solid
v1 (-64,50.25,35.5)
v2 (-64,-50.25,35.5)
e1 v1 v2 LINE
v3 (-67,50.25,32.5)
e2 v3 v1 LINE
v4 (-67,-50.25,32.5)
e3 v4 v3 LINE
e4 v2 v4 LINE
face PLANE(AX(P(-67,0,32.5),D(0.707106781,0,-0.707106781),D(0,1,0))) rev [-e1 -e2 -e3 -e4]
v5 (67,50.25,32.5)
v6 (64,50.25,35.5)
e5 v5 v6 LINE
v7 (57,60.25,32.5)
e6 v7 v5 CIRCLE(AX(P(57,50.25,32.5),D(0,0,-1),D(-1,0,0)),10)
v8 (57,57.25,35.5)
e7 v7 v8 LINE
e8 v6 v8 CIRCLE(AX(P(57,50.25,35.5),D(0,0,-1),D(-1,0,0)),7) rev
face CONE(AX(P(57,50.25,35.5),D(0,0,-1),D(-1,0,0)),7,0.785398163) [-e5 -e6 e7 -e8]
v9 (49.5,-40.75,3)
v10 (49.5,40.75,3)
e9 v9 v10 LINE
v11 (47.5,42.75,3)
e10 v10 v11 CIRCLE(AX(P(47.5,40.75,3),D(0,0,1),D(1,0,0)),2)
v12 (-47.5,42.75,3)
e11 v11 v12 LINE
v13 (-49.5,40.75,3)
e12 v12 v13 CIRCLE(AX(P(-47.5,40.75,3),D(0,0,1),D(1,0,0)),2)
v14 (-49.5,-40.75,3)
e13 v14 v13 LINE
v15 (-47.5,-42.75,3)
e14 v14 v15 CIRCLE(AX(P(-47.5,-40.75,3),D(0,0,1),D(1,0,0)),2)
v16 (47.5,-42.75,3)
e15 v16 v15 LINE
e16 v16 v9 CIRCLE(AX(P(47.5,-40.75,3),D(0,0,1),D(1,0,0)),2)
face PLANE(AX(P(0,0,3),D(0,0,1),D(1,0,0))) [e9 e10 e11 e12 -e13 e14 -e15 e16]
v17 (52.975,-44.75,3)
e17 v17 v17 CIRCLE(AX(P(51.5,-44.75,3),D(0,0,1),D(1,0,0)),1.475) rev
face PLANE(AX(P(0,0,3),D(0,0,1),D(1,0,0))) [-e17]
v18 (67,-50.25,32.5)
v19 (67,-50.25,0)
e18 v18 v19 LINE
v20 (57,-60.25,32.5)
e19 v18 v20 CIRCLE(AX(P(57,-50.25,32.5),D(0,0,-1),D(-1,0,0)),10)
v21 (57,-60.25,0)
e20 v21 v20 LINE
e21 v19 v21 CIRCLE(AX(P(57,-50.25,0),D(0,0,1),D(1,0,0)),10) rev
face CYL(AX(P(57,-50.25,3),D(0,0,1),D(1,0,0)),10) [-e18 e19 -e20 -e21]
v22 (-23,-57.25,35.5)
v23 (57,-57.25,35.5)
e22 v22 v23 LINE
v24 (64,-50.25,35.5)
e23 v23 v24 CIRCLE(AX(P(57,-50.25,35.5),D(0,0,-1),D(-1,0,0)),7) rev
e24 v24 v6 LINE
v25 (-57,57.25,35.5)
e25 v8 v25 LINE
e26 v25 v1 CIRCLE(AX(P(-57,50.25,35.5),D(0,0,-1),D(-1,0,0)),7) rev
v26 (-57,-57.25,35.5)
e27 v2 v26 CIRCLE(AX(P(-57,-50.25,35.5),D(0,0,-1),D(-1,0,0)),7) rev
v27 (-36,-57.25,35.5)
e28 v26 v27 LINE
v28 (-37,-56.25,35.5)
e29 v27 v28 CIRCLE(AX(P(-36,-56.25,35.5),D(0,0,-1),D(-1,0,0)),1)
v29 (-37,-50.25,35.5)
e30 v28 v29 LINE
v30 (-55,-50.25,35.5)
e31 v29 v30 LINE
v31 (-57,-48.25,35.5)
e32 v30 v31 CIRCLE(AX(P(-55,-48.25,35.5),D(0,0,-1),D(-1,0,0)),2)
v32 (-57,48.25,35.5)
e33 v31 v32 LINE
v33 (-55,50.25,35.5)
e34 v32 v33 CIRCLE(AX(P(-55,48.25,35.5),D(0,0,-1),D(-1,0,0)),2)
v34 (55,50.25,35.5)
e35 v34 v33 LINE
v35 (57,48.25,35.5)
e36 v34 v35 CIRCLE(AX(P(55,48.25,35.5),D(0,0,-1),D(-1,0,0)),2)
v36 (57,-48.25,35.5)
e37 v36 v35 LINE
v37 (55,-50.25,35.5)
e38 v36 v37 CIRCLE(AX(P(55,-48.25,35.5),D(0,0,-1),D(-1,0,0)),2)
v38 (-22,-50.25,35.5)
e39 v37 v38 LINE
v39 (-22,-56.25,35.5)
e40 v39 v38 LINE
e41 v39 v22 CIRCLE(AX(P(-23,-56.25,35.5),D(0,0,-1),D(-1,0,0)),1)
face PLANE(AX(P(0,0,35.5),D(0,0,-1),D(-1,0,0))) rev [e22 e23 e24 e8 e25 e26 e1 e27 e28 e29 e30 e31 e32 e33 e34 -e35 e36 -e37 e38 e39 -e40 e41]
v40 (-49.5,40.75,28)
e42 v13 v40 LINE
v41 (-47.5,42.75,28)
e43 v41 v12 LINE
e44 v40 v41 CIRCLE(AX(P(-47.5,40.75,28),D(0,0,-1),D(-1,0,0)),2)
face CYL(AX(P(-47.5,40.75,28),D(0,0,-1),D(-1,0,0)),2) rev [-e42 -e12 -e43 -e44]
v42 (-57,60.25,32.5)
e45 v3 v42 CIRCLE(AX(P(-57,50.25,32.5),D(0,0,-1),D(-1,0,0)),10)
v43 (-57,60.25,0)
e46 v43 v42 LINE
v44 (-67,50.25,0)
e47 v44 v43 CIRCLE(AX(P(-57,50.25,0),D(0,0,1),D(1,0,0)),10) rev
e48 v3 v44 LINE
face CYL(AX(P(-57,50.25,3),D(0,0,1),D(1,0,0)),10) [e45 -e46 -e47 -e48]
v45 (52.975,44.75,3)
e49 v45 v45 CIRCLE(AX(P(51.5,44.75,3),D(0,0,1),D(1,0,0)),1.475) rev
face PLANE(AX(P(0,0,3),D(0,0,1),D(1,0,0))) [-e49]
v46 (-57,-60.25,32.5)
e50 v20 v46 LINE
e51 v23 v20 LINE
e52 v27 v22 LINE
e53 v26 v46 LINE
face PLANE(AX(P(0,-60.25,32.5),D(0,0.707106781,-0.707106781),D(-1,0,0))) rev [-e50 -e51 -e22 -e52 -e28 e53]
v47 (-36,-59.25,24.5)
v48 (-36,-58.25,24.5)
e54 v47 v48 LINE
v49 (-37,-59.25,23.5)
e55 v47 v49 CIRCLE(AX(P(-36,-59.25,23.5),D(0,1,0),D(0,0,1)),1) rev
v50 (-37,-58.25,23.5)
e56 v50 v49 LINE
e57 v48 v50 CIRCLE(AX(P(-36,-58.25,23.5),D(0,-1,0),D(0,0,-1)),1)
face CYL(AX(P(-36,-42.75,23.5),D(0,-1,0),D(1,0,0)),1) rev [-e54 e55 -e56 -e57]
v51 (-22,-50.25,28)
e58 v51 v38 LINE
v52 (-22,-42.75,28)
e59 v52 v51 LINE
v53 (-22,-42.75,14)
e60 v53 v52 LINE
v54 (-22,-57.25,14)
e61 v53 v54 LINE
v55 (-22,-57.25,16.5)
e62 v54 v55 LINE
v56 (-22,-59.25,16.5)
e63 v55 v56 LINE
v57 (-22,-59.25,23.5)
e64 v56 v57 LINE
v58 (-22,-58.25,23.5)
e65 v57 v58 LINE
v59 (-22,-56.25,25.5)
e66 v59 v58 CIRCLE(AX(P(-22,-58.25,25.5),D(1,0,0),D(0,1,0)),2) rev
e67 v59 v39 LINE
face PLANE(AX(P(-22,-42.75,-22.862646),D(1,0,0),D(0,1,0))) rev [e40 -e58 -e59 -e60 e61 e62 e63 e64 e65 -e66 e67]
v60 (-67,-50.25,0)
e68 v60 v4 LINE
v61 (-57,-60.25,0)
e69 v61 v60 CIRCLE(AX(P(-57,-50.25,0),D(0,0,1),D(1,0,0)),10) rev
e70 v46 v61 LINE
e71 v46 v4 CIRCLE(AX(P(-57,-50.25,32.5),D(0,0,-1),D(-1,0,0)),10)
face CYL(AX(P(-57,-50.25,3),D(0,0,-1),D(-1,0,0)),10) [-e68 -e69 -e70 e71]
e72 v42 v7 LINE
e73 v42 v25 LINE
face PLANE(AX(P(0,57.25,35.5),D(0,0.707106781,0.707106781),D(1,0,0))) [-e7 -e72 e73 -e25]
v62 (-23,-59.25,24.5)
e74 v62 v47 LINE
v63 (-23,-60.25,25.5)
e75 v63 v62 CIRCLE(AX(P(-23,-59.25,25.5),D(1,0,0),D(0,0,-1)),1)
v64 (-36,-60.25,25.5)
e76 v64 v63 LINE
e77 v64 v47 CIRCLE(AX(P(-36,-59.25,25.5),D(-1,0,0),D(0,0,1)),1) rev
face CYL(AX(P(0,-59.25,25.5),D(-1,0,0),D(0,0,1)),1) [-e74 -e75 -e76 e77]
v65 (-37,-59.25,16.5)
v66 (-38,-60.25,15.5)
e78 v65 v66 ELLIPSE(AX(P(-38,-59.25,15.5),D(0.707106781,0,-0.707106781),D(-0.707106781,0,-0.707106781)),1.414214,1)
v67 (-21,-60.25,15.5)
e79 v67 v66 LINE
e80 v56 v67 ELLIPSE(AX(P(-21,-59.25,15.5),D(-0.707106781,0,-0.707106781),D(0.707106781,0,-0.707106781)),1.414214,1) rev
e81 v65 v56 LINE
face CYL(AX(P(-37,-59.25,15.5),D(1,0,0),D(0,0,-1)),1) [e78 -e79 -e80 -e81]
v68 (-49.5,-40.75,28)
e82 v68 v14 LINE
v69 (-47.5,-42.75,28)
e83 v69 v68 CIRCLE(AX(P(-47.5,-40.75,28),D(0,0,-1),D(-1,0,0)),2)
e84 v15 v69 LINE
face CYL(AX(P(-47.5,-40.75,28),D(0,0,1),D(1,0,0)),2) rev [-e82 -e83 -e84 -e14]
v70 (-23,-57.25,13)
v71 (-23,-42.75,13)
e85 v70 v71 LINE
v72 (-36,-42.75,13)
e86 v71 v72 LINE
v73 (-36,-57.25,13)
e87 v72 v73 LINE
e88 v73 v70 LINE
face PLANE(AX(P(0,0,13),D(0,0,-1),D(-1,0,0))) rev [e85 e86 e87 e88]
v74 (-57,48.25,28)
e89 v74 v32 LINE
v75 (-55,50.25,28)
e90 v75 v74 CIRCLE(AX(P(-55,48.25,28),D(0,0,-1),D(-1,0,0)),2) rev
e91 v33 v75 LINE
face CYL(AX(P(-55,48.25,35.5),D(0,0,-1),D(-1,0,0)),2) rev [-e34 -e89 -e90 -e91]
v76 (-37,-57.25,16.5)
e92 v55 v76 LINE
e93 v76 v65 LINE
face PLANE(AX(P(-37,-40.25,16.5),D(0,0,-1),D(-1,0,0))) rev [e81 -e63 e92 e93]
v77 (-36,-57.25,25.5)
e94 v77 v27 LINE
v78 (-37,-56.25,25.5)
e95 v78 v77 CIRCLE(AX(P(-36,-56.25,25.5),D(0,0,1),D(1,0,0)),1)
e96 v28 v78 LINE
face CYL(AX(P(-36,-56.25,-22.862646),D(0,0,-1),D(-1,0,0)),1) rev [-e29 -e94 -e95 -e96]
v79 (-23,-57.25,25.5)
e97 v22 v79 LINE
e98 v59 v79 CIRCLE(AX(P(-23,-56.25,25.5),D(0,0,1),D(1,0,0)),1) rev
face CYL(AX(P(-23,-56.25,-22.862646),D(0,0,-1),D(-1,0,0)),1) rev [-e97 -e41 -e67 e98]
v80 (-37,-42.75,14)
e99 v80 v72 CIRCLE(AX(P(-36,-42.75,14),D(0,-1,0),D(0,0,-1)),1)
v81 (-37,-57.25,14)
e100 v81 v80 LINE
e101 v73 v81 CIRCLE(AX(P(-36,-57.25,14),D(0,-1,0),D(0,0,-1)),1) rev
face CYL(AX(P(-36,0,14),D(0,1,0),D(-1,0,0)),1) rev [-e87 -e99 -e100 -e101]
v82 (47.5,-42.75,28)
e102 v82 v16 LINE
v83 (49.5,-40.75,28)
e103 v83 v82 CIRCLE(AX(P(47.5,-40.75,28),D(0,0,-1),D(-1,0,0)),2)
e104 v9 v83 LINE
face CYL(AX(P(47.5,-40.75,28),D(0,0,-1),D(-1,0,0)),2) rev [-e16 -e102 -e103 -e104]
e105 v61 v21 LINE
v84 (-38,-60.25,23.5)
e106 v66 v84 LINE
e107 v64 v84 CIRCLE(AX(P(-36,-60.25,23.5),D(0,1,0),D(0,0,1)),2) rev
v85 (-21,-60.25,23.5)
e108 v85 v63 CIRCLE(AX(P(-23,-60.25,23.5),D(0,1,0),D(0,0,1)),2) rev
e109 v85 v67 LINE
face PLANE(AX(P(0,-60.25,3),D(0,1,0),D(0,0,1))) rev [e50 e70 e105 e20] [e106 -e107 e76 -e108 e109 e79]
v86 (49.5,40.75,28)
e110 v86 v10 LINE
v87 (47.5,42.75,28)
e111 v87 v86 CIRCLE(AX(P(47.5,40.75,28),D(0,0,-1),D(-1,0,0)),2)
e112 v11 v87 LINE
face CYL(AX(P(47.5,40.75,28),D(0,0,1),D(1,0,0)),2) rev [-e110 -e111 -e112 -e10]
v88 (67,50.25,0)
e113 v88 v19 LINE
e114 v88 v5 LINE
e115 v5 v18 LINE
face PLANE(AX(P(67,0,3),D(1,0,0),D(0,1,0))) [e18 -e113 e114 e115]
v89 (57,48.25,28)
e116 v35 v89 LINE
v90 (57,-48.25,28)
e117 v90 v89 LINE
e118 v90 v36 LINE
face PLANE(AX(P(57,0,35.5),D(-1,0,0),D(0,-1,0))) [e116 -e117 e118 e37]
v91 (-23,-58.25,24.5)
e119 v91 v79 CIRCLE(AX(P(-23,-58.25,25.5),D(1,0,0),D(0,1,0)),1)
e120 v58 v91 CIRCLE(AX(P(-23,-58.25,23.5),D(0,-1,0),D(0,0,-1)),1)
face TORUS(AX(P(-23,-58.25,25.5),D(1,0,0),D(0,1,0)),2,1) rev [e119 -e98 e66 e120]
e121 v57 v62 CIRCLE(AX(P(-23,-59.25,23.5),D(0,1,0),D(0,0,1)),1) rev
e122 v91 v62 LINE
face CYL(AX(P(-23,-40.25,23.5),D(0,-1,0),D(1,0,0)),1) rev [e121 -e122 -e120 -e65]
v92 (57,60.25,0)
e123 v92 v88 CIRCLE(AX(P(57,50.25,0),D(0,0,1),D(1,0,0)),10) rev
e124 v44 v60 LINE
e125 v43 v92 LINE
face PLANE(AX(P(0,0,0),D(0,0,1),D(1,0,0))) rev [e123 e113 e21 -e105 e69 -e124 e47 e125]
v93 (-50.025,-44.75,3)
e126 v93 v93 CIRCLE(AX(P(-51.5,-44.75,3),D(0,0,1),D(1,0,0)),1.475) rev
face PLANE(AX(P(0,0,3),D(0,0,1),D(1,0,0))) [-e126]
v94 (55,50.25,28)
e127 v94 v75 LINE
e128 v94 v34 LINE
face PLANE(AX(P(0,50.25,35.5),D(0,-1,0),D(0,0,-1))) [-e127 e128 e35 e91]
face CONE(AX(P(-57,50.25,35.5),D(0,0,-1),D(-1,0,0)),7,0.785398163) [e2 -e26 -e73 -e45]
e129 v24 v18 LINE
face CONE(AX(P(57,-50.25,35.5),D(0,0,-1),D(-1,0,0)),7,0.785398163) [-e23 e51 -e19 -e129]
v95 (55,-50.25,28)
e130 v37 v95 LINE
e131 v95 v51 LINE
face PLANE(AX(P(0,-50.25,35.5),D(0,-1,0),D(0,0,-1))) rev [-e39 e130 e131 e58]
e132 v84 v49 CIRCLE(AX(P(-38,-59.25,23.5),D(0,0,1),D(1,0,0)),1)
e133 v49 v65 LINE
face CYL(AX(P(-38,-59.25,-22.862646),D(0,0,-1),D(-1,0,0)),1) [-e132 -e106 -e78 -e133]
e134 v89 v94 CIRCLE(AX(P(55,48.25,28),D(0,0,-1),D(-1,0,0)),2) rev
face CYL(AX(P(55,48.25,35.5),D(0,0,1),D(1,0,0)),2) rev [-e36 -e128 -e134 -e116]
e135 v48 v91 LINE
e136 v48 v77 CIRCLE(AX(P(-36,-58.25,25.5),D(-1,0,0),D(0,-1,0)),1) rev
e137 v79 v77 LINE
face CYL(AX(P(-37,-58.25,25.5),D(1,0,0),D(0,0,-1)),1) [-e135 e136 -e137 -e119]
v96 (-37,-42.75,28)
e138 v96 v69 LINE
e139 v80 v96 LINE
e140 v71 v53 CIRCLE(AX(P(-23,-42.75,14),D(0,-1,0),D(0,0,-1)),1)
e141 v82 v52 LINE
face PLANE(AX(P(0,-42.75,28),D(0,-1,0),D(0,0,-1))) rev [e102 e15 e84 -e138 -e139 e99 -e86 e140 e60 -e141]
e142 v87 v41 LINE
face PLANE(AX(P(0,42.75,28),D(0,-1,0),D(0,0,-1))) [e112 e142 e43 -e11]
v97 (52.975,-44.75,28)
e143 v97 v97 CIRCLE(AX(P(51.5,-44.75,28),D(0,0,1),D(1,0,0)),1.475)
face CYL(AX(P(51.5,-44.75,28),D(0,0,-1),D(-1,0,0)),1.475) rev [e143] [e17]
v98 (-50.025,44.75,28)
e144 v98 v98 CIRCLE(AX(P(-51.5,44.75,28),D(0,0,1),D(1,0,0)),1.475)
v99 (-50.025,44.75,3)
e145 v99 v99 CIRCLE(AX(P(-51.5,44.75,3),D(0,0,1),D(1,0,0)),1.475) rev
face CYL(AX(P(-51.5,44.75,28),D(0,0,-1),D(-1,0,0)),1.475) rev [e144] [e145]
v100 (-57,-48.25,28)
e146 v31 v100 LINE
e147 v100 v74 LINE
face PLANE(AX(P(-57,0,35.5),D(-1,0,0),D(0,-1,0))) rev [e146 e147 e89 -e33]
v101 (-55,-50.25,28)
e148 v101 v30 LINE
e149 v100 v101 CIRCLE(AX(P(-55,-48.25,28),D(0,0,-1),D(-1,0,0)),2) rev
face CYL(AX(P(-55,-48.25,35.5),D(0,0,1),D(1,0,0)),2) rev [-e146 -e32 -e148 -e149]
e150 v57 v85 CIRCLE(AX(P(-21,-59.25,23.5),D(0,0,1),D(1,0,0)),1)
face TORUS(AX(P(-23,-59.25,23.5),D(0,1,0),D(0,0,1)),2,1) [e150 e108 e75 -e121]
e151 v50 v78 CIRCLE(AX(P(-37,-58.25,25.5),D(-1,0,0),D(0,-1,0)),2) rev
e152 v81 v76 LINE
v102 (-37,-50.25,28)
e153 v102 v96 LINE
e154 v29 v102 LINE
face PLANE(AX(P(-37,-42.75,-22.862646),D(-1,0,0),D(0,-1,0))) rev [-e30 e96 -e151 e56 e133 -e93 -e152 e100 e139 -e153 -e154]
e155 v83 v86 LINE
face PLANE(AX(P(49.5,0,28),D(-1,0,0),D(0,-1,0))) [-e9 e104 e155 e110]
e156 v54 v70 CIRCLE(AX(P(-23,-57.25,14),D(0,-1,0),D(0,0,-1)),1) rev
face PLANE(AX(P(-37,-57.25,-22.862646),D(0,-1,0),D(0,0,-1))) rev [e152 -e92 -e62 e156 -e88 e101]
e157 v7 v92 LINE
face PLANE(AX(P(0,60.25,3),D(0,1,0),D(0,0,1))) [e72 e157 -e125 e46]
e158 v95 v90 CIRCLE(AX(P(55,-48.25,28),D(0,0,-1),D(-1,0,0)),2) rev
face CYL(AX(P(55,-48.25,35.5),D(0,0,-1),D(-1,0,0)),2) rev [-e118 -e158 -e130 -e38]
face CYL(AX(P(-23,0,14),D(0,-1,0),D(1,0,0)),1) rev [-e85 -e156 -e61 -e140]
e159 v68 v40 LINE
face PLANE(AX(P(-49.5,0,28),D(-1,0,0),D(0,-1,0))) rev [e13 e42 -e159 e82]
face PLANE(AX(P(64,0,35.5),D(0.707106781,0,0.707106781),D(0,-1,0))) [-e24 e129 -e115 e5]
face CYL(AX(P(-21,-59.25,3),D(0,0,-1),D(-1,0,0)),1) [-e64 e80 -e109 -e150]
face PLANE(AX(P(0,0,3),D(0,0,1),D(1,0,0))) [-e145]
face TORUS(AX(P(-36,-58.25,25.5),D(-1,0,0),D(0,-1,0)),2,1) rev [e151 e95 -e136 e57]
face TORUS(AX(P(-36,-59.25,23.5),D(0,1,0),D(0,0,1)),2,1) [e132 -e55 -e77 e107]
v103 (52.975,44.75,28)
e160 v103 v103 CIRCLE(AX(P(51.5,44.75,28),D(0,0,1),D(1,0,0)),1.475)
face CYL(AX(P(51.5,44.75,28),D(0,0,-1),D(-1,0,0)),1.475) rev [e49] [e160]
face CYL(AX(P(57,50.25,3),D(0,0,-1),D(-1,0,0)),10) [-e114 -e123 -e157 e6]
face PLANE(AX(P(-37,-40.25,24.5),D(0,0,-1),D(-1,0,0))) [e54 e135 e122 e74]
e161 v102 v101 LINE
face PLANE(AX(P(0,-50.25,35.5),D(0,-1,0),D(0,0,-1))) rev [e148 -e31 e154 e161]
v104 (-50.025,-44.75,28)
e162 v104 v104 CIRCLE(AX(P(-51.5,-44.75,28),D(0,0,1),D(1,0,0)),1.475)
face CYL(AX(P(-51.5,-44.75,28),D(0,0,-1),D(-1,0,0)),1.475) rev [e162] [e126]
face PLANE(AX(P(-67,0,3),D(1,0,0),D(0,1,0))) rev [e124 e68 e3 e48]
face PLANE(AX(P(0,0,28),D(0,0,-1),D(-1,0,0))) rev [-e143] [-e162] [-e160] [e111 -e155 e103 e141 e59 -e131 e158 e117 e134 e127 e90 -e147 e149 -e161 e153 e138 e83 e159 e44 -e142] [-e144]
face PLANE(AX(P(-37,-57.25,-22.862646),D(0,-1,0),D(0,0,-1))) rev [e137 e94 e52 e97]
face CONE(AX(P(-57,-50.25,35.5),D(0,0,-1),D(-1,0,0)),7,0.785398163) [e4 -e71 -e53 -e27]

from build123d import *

# Parameters (mm, degrees)
BASE_W              = 134
BASE_H              = 120.5
BASE_W_2            = 114
BASE_H_2            = 100.5
BASE_R              = 1.475
BASE_W_3            = 99
BASE_H_3            = 85.5
BOSS_EXTRUDE1_DEPTH = 3
BOSS_EXTRUDE2_START = 3
BASE_3_W            = 114
BASE_3_H            = 100.5
BASE_3_R            = 1.475
BASE_3_W_2          = 99
BASE_3_H_2          = 85.5
BOSS_EXTRUDE2_DEPTH = 25
BOSS_EXTRUDE3_START = 3
BASE_4_W            = 134
BASE_4_H            = 120.5
BASE_4_W_2          = 114
BASE_4_H_2          = 100.5
BOSS_EXTRUDE3_DEPTH = 32.5
SKETCH2_W           = 15
SKETCH2_H           = 14.5
CUT_EXTRUDE1_DEPTH  = 22.5
SKETCH3_W           = 15
SKETCH3_H           = 8
CUT_EXTRUDE2_DEPTH  = 3
FILLET1_R           = 10
FILLET2_R           = 2
FILLET3_R           = 1
CHAMFER1_SIZE       = 3


with BuildPart() as part:
    # Base → Boss-Extrude1 (new body)
    # profile 1 of 7: a face of its own
    with BuildSketch(Plane.XY):
        Rectangle(BASE_W, BASE_H)
        Rectangle(BASE_W_2, BASE_H_2, mode=Mode.SUBTRACT)
    # profile 2 of 7: a face of its own
    with BuildSketch(Plane.XY):
        Rectangle(BASE_W_2, BASE_H_2)
        with Locations((-51.5, -44.75)):
            Circle(BASE_R, mode=Mode.SUBTRACT)
        with Locations((51.5, -44.75)):
            Circle(BASE_R, mode=Mode.SUBTRACT)
        with Locations((51.5, 44.75)):
            Circle(BASE_R, mode=Mode.SUBTRACT)
        with Locations((-51.5, 44.75)):
            Circle(BASE_R, mode=Mode.SUBTRACT)
        Rectangle(BASE_W_3, BASE_H_3, mode=Mode.SUBTRACT)
    # profile 3 of 7: a face of its own
    with BuildSketch(Plane.XY):
        with Locations((51.5, -44.75)):
            Circle(BASE_R)
    # profile 4 of 7: a face of its own
    with BuildSketch(Plane.XY):
        with Locations((-51.5, 44.75)):
            Circle(BASE_R)
    # profile 5 of 7: a face of its own
    with BuildSketch(Plane.XY):
        with Locations((-51.5, -44.75)):
            Circle(BASE_R)
    # profile 6 of 7: a face of its own
    with BuildSketch(Plane.XY):
        with Locations((51.5, 44.75)):
            Circle(BASE_R)
    # profile 7 of 7: a face of its own
    with BuildSketch(Plane.XY):
        Rectangle(BASE_W_3, BASE_H_3)
    extrude(amount=BOSS_EXTRUDE1_DEPTH)

    # Base<3> → Boss-Extrude2 (add)
    with BuildSketch(Plane.XY.offset(BOSS_EXTRUDE2_START)):
        Rectangle(BASE_3_W, BASE_3_H)
        with Locations((-51.5, -44.75)):
            Circle(BASE_3_R, mode=Mode.SUBTRACT)
        with Locations((51.5, -44.75)):
            Circle(BASE_3_R, mode=Mode.SUBTRACT)
        with Locations((51.5, 44.75)):
            Circle(BASE_3_R, mode=Mode.SUBTRACT)
        with Locations((-51.5, 44.75)):
            Circle(BASE_3_R, mode=Mode.SUBTRACT)
        Rectangle(BASE_3_W_2, BASE_3_H_2, mode=Mode.SUBTRACT)
    extrude(amount=BOSS_EXTRUDE2_DEPTH)

    # Base<4> → Boss-Extrude3 (add)
    with BuildSketch(Plane.XY.offset(BOSS_EXTRUDE3_START)):
        Rectangle(BASE_4_W, BASE_4_H)
        Rectangle(BASE_4_W_2, BASE_4_H_2, mode=Mode.SUBTRACT)
    extrude(amount=BOSS_EXTRUDE3_DEPTH)

    # Sketch2 → Cut-Extrude1 (cut)
    with BuildSketch(Plane.XY.offset(35.5)):
        with Locations((-29.5, -50)):
            Rectangle(SKETCH2_W, SKETCH2_H)
    extrude(amount=-CUT_EXTRUDE1_DEPTH, mode=Mode.SUBTRACT)

    # Sketch3 → Cut-Extrude2 (cut)
    with BuildSketch(Plane.XZ.offset(60.25)):
        with Locations((-29.5, 20.5)):
            Rectangle(SKETCH3_W, SKETCH3_H)
    extrude(amount=-CUT_EXTRUDE2_DEPTH, mode=Mode.SUBTRACT)

    # Fillet1
    fillet1_edges = [part.edges().sort_by_distance(p)[0] for p in [
        (67, 60.25, 17.75),
        (67, -60.25, 17.75),
        (-67, -60.25, 17.75),
        (-67, 60.25, 17.75),
    ]]
    fillet(fillet1_edges, radius=FILLET1_R)

    # Fillet2
    fillet2_edges = [part.edges().sort_by_distance(p)[0] for p in [
        (49.5, -42.75, 15.5),
        (49.5, 42.75, 15.5),
        (-49.5, 42.75, 15.5),
        (-49.5, -42.75, 15.5),
        (57, 50.25, 31.75),
        (-57, -50.25, 31.75),
        (57, -50.25, 31.75),
        (-57, 50.25, 31.75),
    ]]
    fillet(fillet2_edges, radius=FILLET2_R)

    # Fillet3
    fillet3_edges = [part.edges().sort_by_distance(p)[0] for p in [
        (-22, -57.25, 30),
        (-37, -57.25, 30),
        (-37, -60.25, 20.5),
        (-22, -60.25, 20.5),
        (-29.5, -57.25, 24.5),
        (-37, -58.75, 24.5),
        (-29.5, -60.25, 24.5),
        (-22, -58.75, 24.5),
        (-37, -50, 13),
        (-22, -50, 13),
        (-29.5, -60.25, 16.5),
    ]]
    fillet(fillet3_edges, radius=FILLET3_R)

    # Chamfer1
    chamfer1_edges = [part.edges().sort_by_distance(p)[0] for p in [
        (0, 60.25, 35.5),
        (67, 0, 35.5),
        (0, -60.25, 35.5),
        (-67, 0, 35.5),
        (64.071067812, -57.321067812, 35.5),
        (-64.071067812, -57.321067812, 35.5),
        (-64.071067812, 57.321067812, 35.5),
        (64.071067812, 57.321067812, 35.5),
    ]]
    chamfer(chamfer1_edges, length=CHAMFER1_SIZE - 0.0001)  # a hair under: the kernel refuses the full size


solid = part.part
